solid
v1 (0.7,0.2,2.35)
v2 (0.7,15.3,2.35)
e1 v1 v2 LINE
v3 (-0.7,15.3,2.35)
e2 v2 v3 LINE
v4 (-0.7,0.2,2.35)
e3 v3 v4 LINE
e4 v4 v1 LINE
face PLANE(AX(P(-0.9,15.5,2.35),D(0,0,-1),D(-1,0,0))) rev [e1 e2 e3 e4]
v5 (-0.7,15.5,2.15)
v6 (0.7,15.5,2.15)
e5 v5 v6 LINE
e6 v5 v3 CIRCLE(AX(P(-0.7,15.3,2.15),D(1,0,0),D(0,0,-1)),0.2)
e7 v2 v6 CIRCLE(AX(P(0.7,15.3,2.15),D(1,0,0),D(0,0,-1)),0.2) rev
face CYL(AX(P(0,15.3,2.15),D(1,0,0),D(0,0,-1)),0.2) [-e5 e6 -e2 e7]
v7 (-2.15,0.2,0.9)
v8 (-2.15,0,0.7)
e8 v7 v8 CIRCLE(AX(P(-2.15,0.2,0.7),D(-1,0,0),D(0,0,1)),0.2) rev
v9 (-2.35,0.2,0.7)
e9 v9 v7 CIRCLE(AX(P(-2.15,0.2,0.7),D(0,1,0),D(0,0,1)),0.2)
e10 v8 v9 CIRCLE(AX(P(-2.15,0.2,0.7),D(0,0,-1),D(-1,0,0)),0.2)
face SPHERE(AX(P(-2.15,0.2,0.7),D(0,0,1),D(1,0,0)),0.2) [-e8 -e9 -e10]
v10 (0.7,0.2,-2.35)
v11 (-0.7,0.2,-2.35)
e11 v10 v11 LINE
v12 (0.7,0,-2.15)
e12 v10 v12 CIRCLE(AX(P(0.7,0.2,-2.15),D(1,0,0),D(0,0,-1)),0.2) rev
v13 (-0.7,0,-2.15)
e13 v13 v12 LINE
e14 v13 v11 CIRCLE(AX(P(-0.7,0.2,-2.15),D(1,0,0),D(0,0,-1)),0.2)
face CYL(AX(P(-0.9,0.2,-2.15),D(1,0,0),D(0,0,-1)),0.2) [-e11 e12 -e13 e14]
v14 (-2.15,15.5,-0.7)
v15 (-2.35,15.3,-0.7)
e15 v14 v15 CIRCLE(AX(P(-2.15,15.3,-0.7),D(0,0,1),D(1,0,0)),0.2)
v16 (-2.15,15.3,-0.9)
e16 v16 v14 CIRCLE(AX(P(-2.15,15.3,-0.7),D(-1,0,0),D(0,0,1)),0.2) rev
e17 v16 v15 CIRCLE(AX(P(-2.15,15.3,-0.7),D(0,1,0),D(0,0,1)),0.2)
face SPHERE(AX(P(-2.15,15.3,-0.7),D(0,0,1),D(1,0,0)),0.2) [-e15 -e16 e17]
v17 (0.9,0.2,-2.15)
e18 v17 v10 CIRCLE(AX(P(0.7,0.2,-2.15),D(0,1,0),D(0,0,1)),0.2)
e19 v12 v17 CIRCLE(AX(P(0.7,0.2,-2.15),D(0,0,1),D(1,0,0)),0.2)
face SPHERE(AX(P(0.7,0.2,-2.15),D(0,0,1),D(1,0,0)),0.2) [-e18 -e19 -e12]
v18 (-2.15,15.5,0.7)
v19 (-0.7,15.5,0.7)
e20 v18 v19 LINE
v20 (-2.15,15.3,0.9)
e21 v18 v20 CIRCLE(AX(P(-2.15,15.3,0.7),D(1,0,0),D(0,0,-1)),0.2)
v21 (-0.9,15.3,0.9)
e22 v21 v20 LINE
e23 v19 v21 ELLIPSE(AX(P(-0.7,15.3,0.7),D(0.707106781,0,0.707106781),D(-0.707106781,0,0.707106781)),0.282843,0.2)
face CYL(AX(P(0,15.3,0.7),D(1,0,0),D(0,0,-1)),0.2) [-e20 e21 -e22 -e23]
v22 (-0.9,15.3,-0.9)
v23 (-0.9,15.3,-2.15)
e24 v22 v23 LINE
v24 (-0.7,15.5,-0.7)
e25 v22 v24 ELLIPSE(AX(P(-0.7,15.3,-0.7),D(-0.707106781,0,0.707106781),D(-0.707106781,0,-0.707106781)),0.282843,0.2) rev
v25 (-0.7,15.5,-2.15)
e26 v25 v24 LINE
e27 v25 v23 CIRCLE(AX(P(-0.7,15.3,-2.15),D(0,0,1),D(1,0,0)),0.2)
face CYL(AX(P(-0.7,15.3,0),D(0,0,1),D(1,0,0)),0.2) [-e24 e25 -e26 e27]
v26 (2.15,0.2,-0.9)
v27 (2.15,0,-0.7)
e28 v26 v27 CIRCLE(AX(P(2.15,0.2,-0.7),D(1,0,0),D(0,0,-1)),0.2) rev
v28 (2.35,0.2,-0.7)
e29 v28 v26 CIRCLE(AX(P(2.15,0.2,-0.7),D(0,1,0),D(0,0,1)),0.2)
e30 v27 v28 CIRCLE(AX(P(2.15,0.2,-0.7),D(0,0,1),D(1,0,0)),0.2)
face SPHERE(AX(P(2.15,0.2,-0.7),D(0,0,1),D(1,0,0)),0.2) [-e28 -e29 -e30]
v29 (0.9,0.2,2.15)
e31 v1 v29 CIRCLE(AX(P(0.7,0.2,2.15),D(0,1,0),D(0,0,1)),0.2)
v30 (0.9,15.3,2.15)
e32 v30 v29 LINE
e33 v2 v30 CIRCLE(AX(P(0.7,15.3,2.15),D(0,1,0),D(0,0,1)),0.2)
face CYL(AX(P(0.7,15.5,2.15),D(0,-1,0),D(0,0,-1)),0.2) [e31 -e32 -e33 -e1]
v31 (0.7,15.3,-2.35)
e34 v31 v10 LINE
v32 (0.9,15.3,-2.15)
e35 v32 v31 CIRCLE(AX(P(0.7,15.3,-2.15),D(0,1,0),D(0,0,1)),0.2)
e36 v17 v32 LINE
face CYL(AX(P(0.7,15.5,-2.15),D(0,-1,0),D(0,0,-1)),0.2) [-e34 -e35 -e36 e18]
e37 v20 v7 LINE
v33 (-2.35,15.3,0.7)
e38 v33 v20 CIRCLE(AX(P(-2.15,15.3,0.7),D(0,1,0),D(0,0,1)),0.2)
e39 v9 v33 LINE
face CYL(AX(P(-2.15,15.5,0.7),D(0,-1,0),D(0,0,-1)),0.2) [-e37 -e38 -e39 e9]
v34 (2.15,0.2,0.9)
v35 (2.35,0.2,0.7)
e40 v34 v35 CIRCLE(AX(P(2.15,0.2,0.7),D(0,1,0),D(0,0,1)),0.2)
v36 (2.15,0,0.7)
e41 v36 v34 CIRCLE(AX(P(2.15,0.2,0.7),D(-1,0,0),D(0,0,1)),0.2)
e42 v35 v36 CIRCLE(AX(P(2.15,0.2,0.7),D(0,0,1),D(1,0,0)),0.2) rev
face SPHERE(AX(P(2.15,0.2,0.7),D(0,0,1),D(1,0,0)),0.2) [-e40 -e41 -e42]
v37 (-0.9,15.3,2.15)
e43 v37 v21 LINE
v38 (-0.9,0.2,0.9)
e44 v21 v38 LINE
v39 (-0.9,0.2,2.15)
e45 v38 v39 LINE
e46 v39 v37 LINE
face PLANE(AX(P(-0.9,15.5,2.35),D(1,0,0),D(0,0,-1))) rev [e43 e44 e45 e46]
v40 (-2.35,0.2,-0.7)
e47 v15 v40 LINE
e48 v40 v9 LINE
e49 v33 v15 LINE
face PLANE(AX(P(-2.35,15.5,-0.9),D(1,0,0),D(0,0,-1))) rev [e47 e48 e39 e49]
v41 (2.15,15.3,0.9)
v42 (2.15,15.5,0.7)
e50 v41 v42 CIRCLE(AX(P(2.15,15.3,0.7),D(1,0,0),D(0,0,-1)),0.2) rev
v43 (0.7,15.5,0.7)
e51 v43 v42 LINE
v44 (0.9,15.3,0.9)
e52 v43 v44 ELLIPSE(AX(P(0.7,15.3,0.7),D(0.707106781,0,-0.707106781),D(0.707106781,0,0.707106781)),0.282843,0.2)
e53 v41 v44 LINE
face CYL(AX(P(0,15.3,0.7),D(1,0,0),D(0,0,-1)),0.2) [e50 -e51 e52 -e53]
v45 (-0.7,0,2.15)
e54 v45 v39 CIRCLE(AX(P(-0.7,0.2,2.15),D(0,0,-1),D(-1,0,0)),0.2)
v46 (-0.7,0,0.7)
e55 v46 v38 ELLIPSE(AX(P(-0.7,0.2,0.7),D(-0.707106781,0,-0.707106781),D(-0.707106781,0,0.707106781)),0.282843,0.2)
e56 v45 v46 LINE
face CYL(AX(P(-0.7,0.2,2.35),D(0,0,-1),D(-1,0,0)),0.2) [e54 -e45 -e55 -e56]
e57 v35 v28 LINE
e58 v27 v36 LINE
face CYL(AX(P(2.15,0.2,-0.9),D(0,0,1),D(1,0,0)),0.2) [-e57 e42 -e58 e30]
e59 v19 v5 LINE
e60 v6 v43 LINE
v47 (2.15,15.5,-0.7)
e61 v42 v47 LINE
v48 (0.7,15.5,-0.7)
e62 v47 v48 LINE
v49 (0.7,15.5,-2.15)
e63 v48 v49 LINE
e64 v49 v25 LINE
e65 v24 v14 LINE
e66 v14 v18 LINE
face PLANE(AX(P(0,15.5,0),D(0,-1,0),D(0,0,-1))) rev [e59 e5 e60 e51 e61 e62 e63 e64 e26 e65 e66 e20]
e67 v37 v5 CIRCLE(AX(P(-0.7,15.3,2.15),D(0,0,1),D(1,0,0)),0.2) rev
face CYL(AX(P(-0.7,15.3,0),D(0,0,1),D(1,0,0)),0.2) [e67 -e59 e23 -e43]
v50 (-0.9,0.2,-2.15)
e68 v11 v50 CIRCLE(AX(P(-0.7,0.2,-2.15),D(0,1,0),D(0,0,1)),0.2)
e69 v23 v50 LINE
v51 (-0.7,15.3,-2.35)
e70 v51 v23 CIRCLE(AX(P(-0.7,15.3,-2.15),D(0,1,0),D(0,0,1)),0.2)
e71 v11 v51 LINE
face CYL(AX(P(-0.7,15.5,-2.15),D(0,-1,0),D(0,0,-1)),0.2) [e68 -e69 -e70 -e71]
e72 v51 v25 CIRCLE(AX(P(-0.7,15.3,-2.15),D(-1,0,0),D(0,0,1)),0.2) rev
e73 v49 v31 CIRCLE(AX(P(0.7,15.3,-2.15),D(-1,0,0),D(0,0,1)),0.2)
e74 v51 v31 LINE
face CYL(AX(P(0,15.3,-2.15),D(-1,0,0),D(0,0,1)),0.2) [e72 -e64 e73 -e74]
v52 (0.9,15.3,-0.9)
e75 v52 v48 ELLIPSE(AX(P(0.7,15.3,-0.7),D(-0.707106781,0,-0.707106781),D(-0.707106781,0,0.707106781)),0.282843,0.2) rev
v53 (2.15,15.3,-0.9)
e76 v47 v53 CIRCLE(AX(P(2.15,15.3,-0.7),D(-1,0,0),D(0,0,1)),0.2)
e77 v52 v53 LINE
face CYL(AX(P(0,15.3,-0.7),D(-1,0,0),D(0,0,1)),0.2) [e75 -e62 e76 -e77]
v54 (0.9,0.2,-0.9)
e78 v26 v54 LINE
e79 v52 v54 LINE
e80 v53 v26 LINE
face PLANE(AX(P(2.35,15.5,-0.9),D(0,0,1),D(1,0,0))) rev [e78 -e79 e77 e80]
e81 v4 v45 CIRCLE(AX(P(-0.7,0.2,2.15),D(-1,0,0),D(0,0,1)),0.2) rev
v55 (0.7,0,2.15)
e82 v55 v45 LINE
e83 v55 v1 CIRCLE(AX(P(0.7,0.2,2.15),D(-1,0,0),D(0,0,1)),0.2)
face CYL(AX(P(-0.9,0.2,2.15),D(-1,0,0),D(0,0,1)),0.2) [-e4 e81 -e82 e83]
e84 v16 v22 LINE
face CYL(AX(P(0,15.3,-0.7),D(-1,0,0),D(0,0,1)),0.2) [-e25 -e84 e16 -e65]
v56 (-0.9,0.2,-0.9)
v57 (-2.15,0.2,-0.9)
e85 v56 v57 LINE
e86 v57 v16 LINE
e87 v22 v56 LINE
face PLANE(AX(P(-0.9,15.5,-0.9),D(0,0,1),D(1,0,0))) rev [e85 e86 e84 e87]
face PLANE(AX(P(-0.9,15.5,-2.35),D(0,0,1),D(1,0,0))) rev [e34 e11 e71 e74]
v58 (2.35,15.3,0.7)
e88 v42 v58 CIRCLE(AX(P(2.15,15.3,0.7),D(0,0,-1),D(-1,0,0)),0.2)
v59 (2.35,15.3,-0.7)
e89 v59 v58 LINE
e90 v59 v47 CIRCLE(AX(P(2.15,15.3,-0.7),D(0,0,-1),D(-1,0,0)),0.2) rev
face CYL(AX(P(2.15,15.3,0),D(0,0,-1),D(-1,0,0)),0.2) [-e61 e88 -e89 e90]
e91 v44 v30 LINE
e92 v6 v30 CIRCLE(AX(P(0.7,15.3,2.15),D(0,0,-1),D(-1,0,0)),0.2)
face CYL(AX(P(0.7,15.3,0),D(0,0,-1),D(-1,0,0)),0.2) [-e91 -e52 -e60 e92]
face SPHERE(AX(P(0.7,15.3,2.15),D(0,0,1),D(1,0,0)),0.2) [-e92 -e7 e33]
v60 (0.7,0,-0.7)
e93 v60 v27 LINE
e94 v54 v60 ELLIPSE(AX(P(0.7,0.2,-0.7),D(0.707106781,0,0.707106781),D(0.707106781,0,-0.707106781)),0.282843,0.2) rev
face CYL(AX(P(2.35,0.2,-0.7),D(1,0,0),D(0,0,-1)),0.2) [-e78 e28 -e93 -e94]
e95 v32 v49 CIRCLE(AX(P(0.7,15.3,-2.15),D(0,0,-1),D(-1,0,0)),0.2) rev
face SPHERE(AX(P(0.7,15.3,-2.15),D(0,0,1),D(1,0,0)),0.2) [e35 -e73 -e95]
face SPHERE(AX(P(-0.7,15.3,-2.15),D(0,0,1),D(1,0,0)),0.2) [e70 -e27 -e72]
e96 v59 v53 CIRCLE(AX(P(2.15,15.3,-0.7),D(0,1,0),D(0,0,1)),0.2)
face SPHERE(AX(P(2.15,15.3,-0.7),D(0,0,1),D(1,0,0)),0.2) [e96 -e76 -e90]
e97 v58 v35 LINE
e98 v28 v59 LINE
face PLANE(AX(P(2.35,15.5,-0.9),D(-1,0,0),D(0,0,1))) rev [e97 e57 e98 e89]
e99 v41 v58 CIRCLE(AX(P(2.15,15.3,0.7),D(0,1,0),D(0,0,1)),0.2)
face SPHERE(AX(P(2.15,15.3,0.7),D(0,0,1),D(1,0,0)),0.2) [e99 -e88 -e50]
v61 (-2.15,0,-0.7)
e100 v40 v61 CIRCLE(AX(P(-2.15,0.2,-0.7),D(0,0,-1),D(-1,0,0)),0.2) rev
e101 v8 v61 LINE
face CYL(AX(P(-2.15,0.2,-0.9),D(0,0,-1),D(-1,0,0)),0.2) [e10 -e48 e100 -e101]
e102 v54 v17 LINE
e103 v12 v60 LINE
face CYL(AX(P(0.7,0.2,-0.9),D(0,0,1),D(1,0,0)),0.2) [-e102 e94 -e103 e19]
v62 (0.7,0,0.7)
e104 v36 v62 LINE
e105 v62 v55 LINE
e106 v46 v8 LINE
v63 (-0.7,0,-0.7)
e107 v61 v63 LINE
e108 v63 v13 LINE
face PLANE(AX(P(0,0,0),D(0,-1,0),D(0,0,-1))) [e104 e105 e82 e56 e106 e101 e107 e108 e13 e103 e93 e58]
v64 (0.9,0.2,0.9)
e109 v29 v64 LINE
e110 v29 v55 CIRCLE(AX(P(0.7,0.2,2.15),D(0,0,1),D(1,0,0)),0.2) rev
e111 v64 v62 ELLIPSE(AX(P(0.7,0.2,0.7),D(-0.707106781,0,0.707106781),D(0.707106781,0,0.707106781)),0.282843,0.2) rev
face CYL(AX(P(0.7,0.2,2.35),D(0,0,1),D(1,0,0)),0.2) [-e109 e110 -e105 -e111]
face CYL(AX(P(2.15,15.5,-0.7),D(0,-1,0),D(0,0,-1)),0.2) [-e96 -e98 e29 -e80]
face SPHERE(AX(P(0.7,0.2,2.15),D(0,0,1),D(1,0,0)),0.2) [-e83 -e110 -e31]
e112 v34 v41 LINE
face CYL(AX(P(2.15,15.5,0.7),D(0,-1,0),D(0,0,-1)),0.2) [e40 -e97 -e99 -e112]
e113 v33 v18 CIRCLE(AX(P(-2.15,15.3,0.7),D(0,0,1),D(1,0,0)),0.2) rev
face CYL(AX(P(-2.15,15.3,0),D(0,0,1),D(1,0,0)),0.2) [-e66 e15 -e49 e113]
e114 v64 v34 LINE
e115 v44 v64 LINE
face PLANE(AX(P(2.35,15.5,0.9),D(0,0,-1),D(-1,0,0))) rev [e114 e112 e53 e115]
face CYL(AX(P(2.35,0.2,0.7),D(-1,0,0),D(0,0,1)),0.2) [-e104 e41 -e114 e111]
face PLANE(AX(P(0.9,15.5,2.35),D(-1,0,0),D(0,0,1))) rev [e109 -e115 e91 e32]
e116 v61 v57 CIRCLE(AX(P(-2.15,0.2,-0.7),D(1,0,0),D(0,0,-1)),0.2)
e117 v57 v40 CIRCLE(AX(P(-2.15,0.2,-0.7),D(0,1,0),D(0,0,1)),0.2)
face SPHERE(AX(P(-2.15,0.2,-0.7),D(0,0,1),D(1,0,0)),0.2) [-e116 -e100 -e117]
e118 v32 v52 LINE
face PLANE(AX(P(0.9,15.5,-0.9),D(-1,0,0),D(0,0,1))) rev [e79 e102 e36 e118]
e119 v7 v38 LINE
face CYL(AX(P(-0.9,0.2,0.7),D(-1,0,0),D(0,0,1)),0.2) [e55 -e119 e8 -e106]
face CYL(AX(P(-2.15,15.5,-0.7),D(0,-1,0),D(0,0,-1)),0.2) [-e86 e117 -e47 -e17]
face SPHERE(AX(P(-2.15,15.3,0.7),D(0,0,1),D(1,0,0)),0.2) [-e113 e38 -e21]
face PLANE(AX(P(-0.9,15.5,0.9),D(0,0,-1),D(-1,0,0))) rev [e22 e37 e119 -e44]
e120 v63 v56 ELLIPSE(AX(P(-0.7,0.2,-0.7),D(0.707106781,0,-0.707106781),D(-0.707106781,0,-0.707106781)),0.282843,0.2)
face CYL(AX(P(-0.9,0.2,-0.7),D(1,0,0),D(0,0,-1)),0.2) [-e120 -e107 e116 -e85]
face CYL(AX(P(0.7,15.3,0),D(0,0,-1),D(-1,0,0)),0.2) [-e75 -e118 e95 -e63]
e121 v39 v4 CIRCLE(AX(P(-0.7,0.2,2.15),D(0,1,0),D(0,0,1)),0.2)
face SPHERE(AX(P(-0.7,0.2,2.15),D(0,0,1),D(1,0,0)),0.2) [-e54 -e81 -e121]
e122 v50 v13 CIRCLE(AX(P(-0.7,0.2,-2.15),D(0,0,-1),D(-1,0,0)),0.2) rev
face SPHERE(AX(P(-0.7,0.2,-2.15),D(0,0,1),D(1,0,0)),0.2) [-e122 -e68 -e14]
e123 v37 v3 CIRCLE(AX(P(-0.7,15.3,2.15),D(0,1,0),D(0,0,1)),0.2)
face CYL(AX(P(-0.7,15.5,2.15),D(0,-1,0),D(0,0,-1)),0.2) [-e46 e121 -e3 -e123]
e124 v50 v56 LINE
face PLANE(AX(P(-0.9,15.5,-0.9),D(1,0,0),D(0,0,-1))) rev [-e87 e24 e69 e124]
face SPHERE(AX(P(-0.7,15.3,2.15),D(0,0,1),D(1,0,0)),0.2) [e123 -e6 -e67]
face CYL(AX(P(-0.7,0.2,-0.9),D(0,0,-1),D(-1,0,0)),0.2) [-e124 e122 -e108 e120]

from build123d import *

# Parameters (mm, degrees)
BOSS_EXTRUDE1_DEPTH = 15.5
FILLET1_R           = 0.2
FILLET2_R           = 0.2
FILLET3_R           = 0.2


with BuildPart() as part:
    # Sketch1 → Boss-Extrude1 (new body)
    with BuildSketch(Plane(origin=(0, 0, 0), x_dir=(1, 0, 0), z_dir=(0, 1, 0))):
        Polygon((-0.9, 0.9), (-0.9, 2.35), (0.9, 2.35), (0.9, 0.9), (2.35, 0.9), (2.35, -0.9), (0.9, -0.9), (0.9, -2.35), (-0.9, -2.35), (-0.9, -0.9), (-2.35, -0.9), (-2.35, 0.9), align=None)
    extrude(amount=BOSS_EXTRUDE1_DEPTH)

    # Fillet1
    fillet1_edges = [part.edges().sort_by_distance(p)[0] for p in [
        (-0.9, 15.5, -1.625),
        (-1.625, 15.5, -0.9),
        (-2.35, 15.5, 0),
        (-1.625, 15.5, 0.9),
        (-0.9, 15.5, 1.625),
        (0, 15.5, 2.35),
        (0.9, 15.5, 1.625),
        (1.625, 15.5, 0.9),
        (2.35, 15.5, 0),
        (1.625, 15.5, -0.9),
        (0.9, 15.5, -1.625),
        (0, 15.5, -2.35),
    ]]
    fillet(fillet1_edges, radius=FILLET1_R)

    # Fillet2
    fillet2_edges = [part.edges().sort_by_distance(p)[0] for p in [
        (1.625, 0, -0.9),
        (2.35, 0, 0),
        (1.625, 0, 0.9),
        (0.9, 0, 1.625),
        (0, 0, 2.35),
        (-0.9, 0, 1.625),
        (-1.625, 0, 0.9),
        (-2.35, 0, 0),
        (-1.625, 0, -0.9),
        (-0.9, 0, -1.625),
        (0, 0, -2.35),
        (0.9, 0, -1.625),
    ]]
    fillet(fillet2_edges, radius=FILLET2_R)

    # Fillet3
    # the kernel refuses this fillet: 0.2 mm, written as the material it takes off along each edge
    with BuildSketch(Plane(origin=(-2.15, 15.3, 0.7), x_dir=(0, 0, 1), z_dir=(-1, 0, 0))) as fillet3_piece_1_section:
        Polygon((0, 0), (FILLET3_R, 0), (FILLET3_R, FILLET3_R), (0, FILLET3_R), align=None)
    fillet3_piece_1 = extrude(amount=FILLET3_R, mode=Mode.PRIVATE)
    fillet3_piece_1 = fillet3_piece_1 - Plane(origin=(-2.15, 15.3, 0.7), x_dir=(0, -0.7071067811865475, -0.7071067811865475), z_dir=(-1, 0, 0)) * Sphere(FILLET3_R, mode=Mode.PRIVATE)
    add(fillet3_piece_1, mode=Mode.SUBTRACT)
    with BuildSketch(Plane(origin=(-0.7, 15.3, 2.15), x_dir=(0, 0, 1), z_dir=(-1, 0, 0))) as fillet3_piece_2_section:
        Polygon((0, 0), (FILLET3_R, 0), (FILLET3_R, FILLET3_R), (0, FILLET3_R), align=None)
    fillet3_piece_2 = extrude(amount=FILLET3_R, mode=Mode.PRIVATE)
    fillet3_piece_2 = fillet3_piece_2 - Plane(origin=(-0.7, 15.3, 2.15), x_dir=(0, -0.7071067811865475, -0.7071067811865475), z_dir=(-1, 0, 0)) * Sphere(FILLET3_R, mode=Mode.PRIVATE)
    add(fillet3_piece_2, mode=Mode.SUBTRACT)
    with BuildSketch(Plane(origin=(-2.15, 15.3, -0.7), x_dir=(-1, 0, 0), z_dir=(0, 0, -1))) as fillet3_piece_3_section:
        Polygon((0, 0), (FILLET3_R, 0), (FILLET3_R, FILLET3_R), (0, FILLET3_R), align=None)
    fillet3_piece_3 = extrude(amount=FILLET3_R, mode=Mode.PRIVATE)
    fillet3_piece_3 = fillet3_piece_3 - Plane(origin=(-2.15, 15.3, -0.7), x_dir=(0.7071067811865475, -0.7071067811865475, 0), z_dir=(0, 0, -1)) * Sphere(FILLET3_R, mode=Mode.PRIVATE)
    add(fillet3_piece_3, mode=Mode.SUBTRACT)
    with BuildSketch(Plane(origin=(0.7, 15.3, 2.15), x_dir=(0, 0, 1), z_dir=(1, 0, 0))) as fillet3_piece_4_section:
        Polygon((0, 0), (FILLET3_R, 0), (FILLET3_R, -FILLET3_R), (0, -FILLET3_R), align=None)
    fillet3_piece_4 = extrude(amount=FILLET3_R, mode=Mode.PRIVATE)
    fillet3_piece_4 = fillet3_piece_4 - Plane(origin=(0.7, 15.3, 2.15), x_dir=(0, -0.7071067811865475, -0.7071067811865475), z_dir=(1, 0, 0)) * Sphere(FILLET3_R, mode=Mode.PRIVATE)
    add(fillet3_piece_4, mode=Mode.SUBTRACT)
    with BuildSketch(Plane(origin=(-0.7, 15.3, -2.15), x_dir=(0, 0, -1), z_dir=(-1, 0, 0))) as fillet3_piece_5_section:
        Polygon((0, 0), (FILLET3_R, 0), (FILLET3_R, -FILLET3_R), (0, -FILLET3_R), align=None)
    fillet3_piece_5 = extrude(amount=FILLET3_R, mode=Mode.PRIVATE)
    fillet3_piece_5 = fillet3_piece_5 - Plane(origin=(-0.7, 15.3, -2.15), x_dir=(0, -0.7071067811865475, 0.7071067811865475), z_dir=(-1, 0, 0)) * Sphere(FILLET3_R, mode=Mode.PRIVATE)
    add(fillet3_piece_5, mode=Mode.SUBTRACT)
    with BuildSketch(Plane(origin=(2.15, 15.3, 0.7), x_dir=(0, 0, 1), z_dir=(1, 0, 0))) as fillet3_piece_6_section:
        Polygon((0, 0), (FILLET3_R, 0), (FILLET3_R, -FILLET3_R), (0, -FILLET3_R), align=None)
    fillet3_piece_6 = extrude(amount=FILLET3_R, mode=Mode.PRIVATE)
    fillet3_piece_6 = fillet3_piece_6 - Plane(origin=(2.15, 15.3, 0.7), x_dir=(0, -0.7071067811865475, -0.7071067811865475), z_dir=(1, 0, 0)) * Sphere(FILLET3_R, mode=Mode.PRIVATE)
    add(fillet3_piece_6, mode=Mode.SUBTRACT)
    with BuildSketch(Plane(origin=(0.7, 15.3, -2.15), x_dir=(1, 0, 0), z_dir=(0, 0, -1))) as fillet3_piece_7_section:
        Polygon((0, 0), (FILLET3_R, 0), (FILLET3_R, -FILLET3_R), (0, -FILLET3_R), align=None)
    fillet3_piece_7 = extrude(amount=FILLET3_R, mode=Mode.PRIVATE)
    fillet3_piece_7 = fillet3_piece_7 - Plane(origin=(0.7, 15.3, -2.15), x_dir=(-0.7071067811865475, -0.7071067811865475, 0), z_dir=(0, 0, -1)) * Sphere(FILLET3_R, mode=Mode.PRIVATE)
    add(fillet3_piece_7, mode=Mode.SUBTRACT)
    with BuildSketch(Plane(origin=(2.15, 15.3, -0.7), x_dir=(1, 0, 0), z_dir=(0, 0, -1))) as fillet3_piece_8_section:
        Polygon((0, 0), (FILLET3_R, 0), (FILLET3_R, -FILLET3_R), (0, -FILLET3_R), align=None)
    fillet3_piece_8 = extrude(amount=FILLET3_R, mode=Mode.PRIVATE)
    fillet3_piece_8 = fillet3_piece_8 - Plane(origin=(2.15, 15.3, -0.7), x_dir=(-0.7071067811865475, -0.7071067811865475, 0), z_dir=(0, 0, -1)) * Sphere(FILLET3_R, mode=Mode.PRIVATE)
    add(fillet3_piece_8, mode=Mode.SUBTRACT)
    with BuildSketch(Plane(origin=(0.7, 0.2, 2.15), x_dir=(0, 0, 1), z_dir=(1, 0, 0))) as fillet3_piece_9_section:
        Polygon((0, 0), (FILLET3_R, 0), (FILLET3_R, FILLET3_R), (0, FILLET3_R), align=None)
    fillet3_piece_9 = extrude(amount=FILLET3_R, mode=Mode.PRIVATE)
    fillet3_piece_9 = fillet3_piece_9 - Plane(origin=(0.7, 0.2, 2.15), x_dir=(0, 0.7071067811865475, -0.7071067811865475), z_dir=(1, 0, 0)) * Sphere(FILLET3_R, mode=Mode.PRIVATE)
    add(fillet3_piece_9, mode=Mode.SUBTRACT)
    with BuildSketch(Plane(origin=(-0.7, 0.2, 2.15), x_dir=(0, 0, 1), z_dir=(-1, 0, 0))) as fillet3_piece_10_section:
        Polygon((0, 0), (FILLET3_R, 0), (FILLET3_R, -FILLET3_R), (0, -FILLET3_R), align=None)
    fillet3_piece_10 = extrude(amount=FILLET3_R, mode=Mode.PRIVATE)
    fillet3_piece_10 = fillet3_piece_10 - Plane(origin=(-0.7, 0.2, 2.15), x_dir=(0, 0.7071067811865475, -0.7071067811865475), z_dir=(-1, 0, 0)) * Sphere(FILLET3_R, mode=Mode.PRIVATE)
    add(fillet3_piece_10, mode=Mode.SUBTRACT)
    with BuildSketch(Plane(origin=(2.15, 0.2, 0.7), x_dir=(0, 0, 1), z_dir=(1, 0, 0))) as fillet3_piece_11_section:
        Polygon((0, 0), (FILLET3_R, 0), (FILLET3_R, FILLET3_R), (0, FILLET3_R), align=None)
    fillet3_piece_11 = extrude(amount=FILLET3_R, mode=Mode.PRIVATE)
    fillet3_piece_11 = fillet3_piece_11 - Plane(origin=(2.15, 0.2, 0.7), x_dir=(0, 0.7071067811865475, -0.7071067811865475), z_dir=(1, 0, 0)) * Sphere(FILLET3_R, mode=Mode.PRIVATE)
    add(fillet3_piece_11, mode=Mode.SUBTRACT)
    with BuildSketch(Plane(origin=(-2.15, 0.2, 0.7), x_dir=(0, 0, 1), z_dir=(-1, 0, 0))) as fillet3_piece_12_section:
        Polygon((0, 0), (FILLET3_R, 0), (FILLET3_R, -FILLET3_R), (0, -FILLET3_R), align=None)
    fillet3_piece_12 = extrude(amount=FILLET3_R, mode=Mode.PRIVATE)
    fillet3_piece_12 = fillet3_piece_12 - Plane(origin=(-2.15, 0.2, 0.7), x_dir=(0, 0.7071067811865475, -0.7071067811865475), z_dir=(-1, 0, 0)) * Sphere(FILLET3_R, mode=Mode.PRIVATE)
    add(fillet3_piece_12, mode=Mode.SUBTRACT)
    with BuildSketch(Plane(origin=(2.15, 0.2, -0.7), x_dir=(1, 0, 0), z_dir=(0, 0, -1))) as fillet3_piece_13_section:
        Polygon((0, 0), (FILLET3_R, 0), (FILLET3_R, FILLET3_R), (0, FILLET3_R), align=None)
    fillet3_piece_13 = extrude(amount=FILLET3_R, mode=Mode.PRIVATE)
    fillet3_piece_13 = fillet3_piece_13 - Plane(origin=(2.15, 0.2, -0.7), x_dir=(-0.7071067811865475, 0.7071067811865475, 0), z_dir=(0, 0, -1)) * Sphere(FILLET3_R, mode=Mode.PRIVATE)
    add(fillet3_piece_13, mode=Mode.SUBTRACT)
    with BuildSketch(Plane(origin=(-2.15, 0.2, -0.7), x_dir=(-1, 0, 0), z_dir=(0, 0, -1))) as fillet3_piece_14_section:
        Polygon((0, 0), (FILLET3_R, 0), (FILLET3_R, -FILLET3_R), (0, -FILLET3_R), align=None)
    fillet3_piece_14 = extrude(amount=FILLET3_R, mode=Mode.PRIVATE)
    fillet3_piece_14 = fillet3_piece_14 - Plane(origin=(-2.15, 0.2, -0.7), x_dir=(0.7071067811865475, 0.7071067811865475, 0), z_dir=(0, 0, -1)) * Sphere(FILLET3_R, mode=Mode.PRIVATE)
    add(fillet3_piece_14, mode=Mode.SUBTRACT)
    with BuildSketch(Plane(origin=(0.7, 0.2, -2.15), x_dir=(1, 0, 0), z_dir=(0, 0, -1))) as fillet3_piece_15_section:
        Polygon((0, 0), (FILLET3_R, 0), (FILLET3_R, FILLET3_R), (0, FILLET3_R), align=None)
    fillet3_piece_15 = extrude(amount=FILLET3_R, mode=Mode.PRIVATE)
    fillet3_piece_15 = fillet3_piece_15 - Plane(origin=(0.7, 0.2, -2.15), x_dir=(-0.7071067811865475, 0.7071067811865475, 0), z_dir=(0, 0, -1)) * Sphere(FILLET3_R, mode=Mode.PRIVATE)
    add(fillet3_piece_15, mode=Mode.SUBTRACT)
    with BuildSketch(Plane(origin=(-0.7, 0.2, -2.15), x_dir=(0, 0, -1), z_dir=(-1, 0, 0))) as fillet3_piece_16_section:
        Polygon((0, 0), (FILLET3_R, 0), (FILLET3_R, FILLET3_R), (0, FILLET3_R), align=None)
    fillet3_piece_16 = extrude(amount=FILLET3_R, mode=Mode.PRIVATE)
    fillet3_piece_16 = fillet3_piece_16 - Plane(origin=(-0.7, 0.2, -2.15), x_dir=(0, 0.7071067811865475, 0.7071067811865475), z_dir=(-1, 0, 0)) * Sphere(FILLET3_R, mode=Mode.PRIVATE)
    add(fillet3_piece_16, mode=Mode.SUBTRACT)
    with BuildSketch(Plane(origin=(2.35, 0.2, -0.9), x_dir=(-1, 0, 0), z_dir=(0, 1, 0)), Plane(origin=(2.35, 0.2, 0.9), x_dir=(0, 0, -1), z_dir=(0, 1, 0)), Plane(origin=(0.9, 0.2, 2.35), x_dir=(0, 0, -1), z_dir=(0, 1, 0)), Plane(origin=(-0.9, 0.2, -2.35), x_dir=(0, 0, 1), z_dir=(0, 1, 0)), Plane(origin=(0.9, 0.2, -2.35), x_dir=(-1, 0, 0), z_dir=(0, 1, 0))) as fillet3_piece_17:
        with BuildLine():
            CenterArc((FILLET3_R, FILLET3_R), FILLET3_R, 180, 90)
            Line((0, FILLET3_R), (0, 0))
            Line((0, 0), (FILLET3_R, 0))
        make_face()
    extrude(amount=15.1, mode=Mode.SUBTRACT)
    with BuildSketch(Plane(origin=(-0.9, 0.2, 2.35), x_dir=(0, 0, -1), z_dir=(0, 1, 0)), Plane(origin=(-2.35, 0.2, 0.9), x_dir=(0, 0, -1), z_dir=(0, 1, 0)), Plane(origin=(-2.35, 0.2, -0.9), x_dir=(1, 0, 0), z_dir=(0, 1, 0))) as fillet3_piece_18:
        with BuildLine():
            CenterArc((FILLET3_R, -FILLET3_R), FILLET3_R, 90, 90)
            Line((0, -FILLET3_R), (0, 0))
            Line((0, 0), (FILLET3_R, 0))
        make_face()
    extrude(amount=15.1, mode=Mode.SUBTRACT)


solid = part.part
